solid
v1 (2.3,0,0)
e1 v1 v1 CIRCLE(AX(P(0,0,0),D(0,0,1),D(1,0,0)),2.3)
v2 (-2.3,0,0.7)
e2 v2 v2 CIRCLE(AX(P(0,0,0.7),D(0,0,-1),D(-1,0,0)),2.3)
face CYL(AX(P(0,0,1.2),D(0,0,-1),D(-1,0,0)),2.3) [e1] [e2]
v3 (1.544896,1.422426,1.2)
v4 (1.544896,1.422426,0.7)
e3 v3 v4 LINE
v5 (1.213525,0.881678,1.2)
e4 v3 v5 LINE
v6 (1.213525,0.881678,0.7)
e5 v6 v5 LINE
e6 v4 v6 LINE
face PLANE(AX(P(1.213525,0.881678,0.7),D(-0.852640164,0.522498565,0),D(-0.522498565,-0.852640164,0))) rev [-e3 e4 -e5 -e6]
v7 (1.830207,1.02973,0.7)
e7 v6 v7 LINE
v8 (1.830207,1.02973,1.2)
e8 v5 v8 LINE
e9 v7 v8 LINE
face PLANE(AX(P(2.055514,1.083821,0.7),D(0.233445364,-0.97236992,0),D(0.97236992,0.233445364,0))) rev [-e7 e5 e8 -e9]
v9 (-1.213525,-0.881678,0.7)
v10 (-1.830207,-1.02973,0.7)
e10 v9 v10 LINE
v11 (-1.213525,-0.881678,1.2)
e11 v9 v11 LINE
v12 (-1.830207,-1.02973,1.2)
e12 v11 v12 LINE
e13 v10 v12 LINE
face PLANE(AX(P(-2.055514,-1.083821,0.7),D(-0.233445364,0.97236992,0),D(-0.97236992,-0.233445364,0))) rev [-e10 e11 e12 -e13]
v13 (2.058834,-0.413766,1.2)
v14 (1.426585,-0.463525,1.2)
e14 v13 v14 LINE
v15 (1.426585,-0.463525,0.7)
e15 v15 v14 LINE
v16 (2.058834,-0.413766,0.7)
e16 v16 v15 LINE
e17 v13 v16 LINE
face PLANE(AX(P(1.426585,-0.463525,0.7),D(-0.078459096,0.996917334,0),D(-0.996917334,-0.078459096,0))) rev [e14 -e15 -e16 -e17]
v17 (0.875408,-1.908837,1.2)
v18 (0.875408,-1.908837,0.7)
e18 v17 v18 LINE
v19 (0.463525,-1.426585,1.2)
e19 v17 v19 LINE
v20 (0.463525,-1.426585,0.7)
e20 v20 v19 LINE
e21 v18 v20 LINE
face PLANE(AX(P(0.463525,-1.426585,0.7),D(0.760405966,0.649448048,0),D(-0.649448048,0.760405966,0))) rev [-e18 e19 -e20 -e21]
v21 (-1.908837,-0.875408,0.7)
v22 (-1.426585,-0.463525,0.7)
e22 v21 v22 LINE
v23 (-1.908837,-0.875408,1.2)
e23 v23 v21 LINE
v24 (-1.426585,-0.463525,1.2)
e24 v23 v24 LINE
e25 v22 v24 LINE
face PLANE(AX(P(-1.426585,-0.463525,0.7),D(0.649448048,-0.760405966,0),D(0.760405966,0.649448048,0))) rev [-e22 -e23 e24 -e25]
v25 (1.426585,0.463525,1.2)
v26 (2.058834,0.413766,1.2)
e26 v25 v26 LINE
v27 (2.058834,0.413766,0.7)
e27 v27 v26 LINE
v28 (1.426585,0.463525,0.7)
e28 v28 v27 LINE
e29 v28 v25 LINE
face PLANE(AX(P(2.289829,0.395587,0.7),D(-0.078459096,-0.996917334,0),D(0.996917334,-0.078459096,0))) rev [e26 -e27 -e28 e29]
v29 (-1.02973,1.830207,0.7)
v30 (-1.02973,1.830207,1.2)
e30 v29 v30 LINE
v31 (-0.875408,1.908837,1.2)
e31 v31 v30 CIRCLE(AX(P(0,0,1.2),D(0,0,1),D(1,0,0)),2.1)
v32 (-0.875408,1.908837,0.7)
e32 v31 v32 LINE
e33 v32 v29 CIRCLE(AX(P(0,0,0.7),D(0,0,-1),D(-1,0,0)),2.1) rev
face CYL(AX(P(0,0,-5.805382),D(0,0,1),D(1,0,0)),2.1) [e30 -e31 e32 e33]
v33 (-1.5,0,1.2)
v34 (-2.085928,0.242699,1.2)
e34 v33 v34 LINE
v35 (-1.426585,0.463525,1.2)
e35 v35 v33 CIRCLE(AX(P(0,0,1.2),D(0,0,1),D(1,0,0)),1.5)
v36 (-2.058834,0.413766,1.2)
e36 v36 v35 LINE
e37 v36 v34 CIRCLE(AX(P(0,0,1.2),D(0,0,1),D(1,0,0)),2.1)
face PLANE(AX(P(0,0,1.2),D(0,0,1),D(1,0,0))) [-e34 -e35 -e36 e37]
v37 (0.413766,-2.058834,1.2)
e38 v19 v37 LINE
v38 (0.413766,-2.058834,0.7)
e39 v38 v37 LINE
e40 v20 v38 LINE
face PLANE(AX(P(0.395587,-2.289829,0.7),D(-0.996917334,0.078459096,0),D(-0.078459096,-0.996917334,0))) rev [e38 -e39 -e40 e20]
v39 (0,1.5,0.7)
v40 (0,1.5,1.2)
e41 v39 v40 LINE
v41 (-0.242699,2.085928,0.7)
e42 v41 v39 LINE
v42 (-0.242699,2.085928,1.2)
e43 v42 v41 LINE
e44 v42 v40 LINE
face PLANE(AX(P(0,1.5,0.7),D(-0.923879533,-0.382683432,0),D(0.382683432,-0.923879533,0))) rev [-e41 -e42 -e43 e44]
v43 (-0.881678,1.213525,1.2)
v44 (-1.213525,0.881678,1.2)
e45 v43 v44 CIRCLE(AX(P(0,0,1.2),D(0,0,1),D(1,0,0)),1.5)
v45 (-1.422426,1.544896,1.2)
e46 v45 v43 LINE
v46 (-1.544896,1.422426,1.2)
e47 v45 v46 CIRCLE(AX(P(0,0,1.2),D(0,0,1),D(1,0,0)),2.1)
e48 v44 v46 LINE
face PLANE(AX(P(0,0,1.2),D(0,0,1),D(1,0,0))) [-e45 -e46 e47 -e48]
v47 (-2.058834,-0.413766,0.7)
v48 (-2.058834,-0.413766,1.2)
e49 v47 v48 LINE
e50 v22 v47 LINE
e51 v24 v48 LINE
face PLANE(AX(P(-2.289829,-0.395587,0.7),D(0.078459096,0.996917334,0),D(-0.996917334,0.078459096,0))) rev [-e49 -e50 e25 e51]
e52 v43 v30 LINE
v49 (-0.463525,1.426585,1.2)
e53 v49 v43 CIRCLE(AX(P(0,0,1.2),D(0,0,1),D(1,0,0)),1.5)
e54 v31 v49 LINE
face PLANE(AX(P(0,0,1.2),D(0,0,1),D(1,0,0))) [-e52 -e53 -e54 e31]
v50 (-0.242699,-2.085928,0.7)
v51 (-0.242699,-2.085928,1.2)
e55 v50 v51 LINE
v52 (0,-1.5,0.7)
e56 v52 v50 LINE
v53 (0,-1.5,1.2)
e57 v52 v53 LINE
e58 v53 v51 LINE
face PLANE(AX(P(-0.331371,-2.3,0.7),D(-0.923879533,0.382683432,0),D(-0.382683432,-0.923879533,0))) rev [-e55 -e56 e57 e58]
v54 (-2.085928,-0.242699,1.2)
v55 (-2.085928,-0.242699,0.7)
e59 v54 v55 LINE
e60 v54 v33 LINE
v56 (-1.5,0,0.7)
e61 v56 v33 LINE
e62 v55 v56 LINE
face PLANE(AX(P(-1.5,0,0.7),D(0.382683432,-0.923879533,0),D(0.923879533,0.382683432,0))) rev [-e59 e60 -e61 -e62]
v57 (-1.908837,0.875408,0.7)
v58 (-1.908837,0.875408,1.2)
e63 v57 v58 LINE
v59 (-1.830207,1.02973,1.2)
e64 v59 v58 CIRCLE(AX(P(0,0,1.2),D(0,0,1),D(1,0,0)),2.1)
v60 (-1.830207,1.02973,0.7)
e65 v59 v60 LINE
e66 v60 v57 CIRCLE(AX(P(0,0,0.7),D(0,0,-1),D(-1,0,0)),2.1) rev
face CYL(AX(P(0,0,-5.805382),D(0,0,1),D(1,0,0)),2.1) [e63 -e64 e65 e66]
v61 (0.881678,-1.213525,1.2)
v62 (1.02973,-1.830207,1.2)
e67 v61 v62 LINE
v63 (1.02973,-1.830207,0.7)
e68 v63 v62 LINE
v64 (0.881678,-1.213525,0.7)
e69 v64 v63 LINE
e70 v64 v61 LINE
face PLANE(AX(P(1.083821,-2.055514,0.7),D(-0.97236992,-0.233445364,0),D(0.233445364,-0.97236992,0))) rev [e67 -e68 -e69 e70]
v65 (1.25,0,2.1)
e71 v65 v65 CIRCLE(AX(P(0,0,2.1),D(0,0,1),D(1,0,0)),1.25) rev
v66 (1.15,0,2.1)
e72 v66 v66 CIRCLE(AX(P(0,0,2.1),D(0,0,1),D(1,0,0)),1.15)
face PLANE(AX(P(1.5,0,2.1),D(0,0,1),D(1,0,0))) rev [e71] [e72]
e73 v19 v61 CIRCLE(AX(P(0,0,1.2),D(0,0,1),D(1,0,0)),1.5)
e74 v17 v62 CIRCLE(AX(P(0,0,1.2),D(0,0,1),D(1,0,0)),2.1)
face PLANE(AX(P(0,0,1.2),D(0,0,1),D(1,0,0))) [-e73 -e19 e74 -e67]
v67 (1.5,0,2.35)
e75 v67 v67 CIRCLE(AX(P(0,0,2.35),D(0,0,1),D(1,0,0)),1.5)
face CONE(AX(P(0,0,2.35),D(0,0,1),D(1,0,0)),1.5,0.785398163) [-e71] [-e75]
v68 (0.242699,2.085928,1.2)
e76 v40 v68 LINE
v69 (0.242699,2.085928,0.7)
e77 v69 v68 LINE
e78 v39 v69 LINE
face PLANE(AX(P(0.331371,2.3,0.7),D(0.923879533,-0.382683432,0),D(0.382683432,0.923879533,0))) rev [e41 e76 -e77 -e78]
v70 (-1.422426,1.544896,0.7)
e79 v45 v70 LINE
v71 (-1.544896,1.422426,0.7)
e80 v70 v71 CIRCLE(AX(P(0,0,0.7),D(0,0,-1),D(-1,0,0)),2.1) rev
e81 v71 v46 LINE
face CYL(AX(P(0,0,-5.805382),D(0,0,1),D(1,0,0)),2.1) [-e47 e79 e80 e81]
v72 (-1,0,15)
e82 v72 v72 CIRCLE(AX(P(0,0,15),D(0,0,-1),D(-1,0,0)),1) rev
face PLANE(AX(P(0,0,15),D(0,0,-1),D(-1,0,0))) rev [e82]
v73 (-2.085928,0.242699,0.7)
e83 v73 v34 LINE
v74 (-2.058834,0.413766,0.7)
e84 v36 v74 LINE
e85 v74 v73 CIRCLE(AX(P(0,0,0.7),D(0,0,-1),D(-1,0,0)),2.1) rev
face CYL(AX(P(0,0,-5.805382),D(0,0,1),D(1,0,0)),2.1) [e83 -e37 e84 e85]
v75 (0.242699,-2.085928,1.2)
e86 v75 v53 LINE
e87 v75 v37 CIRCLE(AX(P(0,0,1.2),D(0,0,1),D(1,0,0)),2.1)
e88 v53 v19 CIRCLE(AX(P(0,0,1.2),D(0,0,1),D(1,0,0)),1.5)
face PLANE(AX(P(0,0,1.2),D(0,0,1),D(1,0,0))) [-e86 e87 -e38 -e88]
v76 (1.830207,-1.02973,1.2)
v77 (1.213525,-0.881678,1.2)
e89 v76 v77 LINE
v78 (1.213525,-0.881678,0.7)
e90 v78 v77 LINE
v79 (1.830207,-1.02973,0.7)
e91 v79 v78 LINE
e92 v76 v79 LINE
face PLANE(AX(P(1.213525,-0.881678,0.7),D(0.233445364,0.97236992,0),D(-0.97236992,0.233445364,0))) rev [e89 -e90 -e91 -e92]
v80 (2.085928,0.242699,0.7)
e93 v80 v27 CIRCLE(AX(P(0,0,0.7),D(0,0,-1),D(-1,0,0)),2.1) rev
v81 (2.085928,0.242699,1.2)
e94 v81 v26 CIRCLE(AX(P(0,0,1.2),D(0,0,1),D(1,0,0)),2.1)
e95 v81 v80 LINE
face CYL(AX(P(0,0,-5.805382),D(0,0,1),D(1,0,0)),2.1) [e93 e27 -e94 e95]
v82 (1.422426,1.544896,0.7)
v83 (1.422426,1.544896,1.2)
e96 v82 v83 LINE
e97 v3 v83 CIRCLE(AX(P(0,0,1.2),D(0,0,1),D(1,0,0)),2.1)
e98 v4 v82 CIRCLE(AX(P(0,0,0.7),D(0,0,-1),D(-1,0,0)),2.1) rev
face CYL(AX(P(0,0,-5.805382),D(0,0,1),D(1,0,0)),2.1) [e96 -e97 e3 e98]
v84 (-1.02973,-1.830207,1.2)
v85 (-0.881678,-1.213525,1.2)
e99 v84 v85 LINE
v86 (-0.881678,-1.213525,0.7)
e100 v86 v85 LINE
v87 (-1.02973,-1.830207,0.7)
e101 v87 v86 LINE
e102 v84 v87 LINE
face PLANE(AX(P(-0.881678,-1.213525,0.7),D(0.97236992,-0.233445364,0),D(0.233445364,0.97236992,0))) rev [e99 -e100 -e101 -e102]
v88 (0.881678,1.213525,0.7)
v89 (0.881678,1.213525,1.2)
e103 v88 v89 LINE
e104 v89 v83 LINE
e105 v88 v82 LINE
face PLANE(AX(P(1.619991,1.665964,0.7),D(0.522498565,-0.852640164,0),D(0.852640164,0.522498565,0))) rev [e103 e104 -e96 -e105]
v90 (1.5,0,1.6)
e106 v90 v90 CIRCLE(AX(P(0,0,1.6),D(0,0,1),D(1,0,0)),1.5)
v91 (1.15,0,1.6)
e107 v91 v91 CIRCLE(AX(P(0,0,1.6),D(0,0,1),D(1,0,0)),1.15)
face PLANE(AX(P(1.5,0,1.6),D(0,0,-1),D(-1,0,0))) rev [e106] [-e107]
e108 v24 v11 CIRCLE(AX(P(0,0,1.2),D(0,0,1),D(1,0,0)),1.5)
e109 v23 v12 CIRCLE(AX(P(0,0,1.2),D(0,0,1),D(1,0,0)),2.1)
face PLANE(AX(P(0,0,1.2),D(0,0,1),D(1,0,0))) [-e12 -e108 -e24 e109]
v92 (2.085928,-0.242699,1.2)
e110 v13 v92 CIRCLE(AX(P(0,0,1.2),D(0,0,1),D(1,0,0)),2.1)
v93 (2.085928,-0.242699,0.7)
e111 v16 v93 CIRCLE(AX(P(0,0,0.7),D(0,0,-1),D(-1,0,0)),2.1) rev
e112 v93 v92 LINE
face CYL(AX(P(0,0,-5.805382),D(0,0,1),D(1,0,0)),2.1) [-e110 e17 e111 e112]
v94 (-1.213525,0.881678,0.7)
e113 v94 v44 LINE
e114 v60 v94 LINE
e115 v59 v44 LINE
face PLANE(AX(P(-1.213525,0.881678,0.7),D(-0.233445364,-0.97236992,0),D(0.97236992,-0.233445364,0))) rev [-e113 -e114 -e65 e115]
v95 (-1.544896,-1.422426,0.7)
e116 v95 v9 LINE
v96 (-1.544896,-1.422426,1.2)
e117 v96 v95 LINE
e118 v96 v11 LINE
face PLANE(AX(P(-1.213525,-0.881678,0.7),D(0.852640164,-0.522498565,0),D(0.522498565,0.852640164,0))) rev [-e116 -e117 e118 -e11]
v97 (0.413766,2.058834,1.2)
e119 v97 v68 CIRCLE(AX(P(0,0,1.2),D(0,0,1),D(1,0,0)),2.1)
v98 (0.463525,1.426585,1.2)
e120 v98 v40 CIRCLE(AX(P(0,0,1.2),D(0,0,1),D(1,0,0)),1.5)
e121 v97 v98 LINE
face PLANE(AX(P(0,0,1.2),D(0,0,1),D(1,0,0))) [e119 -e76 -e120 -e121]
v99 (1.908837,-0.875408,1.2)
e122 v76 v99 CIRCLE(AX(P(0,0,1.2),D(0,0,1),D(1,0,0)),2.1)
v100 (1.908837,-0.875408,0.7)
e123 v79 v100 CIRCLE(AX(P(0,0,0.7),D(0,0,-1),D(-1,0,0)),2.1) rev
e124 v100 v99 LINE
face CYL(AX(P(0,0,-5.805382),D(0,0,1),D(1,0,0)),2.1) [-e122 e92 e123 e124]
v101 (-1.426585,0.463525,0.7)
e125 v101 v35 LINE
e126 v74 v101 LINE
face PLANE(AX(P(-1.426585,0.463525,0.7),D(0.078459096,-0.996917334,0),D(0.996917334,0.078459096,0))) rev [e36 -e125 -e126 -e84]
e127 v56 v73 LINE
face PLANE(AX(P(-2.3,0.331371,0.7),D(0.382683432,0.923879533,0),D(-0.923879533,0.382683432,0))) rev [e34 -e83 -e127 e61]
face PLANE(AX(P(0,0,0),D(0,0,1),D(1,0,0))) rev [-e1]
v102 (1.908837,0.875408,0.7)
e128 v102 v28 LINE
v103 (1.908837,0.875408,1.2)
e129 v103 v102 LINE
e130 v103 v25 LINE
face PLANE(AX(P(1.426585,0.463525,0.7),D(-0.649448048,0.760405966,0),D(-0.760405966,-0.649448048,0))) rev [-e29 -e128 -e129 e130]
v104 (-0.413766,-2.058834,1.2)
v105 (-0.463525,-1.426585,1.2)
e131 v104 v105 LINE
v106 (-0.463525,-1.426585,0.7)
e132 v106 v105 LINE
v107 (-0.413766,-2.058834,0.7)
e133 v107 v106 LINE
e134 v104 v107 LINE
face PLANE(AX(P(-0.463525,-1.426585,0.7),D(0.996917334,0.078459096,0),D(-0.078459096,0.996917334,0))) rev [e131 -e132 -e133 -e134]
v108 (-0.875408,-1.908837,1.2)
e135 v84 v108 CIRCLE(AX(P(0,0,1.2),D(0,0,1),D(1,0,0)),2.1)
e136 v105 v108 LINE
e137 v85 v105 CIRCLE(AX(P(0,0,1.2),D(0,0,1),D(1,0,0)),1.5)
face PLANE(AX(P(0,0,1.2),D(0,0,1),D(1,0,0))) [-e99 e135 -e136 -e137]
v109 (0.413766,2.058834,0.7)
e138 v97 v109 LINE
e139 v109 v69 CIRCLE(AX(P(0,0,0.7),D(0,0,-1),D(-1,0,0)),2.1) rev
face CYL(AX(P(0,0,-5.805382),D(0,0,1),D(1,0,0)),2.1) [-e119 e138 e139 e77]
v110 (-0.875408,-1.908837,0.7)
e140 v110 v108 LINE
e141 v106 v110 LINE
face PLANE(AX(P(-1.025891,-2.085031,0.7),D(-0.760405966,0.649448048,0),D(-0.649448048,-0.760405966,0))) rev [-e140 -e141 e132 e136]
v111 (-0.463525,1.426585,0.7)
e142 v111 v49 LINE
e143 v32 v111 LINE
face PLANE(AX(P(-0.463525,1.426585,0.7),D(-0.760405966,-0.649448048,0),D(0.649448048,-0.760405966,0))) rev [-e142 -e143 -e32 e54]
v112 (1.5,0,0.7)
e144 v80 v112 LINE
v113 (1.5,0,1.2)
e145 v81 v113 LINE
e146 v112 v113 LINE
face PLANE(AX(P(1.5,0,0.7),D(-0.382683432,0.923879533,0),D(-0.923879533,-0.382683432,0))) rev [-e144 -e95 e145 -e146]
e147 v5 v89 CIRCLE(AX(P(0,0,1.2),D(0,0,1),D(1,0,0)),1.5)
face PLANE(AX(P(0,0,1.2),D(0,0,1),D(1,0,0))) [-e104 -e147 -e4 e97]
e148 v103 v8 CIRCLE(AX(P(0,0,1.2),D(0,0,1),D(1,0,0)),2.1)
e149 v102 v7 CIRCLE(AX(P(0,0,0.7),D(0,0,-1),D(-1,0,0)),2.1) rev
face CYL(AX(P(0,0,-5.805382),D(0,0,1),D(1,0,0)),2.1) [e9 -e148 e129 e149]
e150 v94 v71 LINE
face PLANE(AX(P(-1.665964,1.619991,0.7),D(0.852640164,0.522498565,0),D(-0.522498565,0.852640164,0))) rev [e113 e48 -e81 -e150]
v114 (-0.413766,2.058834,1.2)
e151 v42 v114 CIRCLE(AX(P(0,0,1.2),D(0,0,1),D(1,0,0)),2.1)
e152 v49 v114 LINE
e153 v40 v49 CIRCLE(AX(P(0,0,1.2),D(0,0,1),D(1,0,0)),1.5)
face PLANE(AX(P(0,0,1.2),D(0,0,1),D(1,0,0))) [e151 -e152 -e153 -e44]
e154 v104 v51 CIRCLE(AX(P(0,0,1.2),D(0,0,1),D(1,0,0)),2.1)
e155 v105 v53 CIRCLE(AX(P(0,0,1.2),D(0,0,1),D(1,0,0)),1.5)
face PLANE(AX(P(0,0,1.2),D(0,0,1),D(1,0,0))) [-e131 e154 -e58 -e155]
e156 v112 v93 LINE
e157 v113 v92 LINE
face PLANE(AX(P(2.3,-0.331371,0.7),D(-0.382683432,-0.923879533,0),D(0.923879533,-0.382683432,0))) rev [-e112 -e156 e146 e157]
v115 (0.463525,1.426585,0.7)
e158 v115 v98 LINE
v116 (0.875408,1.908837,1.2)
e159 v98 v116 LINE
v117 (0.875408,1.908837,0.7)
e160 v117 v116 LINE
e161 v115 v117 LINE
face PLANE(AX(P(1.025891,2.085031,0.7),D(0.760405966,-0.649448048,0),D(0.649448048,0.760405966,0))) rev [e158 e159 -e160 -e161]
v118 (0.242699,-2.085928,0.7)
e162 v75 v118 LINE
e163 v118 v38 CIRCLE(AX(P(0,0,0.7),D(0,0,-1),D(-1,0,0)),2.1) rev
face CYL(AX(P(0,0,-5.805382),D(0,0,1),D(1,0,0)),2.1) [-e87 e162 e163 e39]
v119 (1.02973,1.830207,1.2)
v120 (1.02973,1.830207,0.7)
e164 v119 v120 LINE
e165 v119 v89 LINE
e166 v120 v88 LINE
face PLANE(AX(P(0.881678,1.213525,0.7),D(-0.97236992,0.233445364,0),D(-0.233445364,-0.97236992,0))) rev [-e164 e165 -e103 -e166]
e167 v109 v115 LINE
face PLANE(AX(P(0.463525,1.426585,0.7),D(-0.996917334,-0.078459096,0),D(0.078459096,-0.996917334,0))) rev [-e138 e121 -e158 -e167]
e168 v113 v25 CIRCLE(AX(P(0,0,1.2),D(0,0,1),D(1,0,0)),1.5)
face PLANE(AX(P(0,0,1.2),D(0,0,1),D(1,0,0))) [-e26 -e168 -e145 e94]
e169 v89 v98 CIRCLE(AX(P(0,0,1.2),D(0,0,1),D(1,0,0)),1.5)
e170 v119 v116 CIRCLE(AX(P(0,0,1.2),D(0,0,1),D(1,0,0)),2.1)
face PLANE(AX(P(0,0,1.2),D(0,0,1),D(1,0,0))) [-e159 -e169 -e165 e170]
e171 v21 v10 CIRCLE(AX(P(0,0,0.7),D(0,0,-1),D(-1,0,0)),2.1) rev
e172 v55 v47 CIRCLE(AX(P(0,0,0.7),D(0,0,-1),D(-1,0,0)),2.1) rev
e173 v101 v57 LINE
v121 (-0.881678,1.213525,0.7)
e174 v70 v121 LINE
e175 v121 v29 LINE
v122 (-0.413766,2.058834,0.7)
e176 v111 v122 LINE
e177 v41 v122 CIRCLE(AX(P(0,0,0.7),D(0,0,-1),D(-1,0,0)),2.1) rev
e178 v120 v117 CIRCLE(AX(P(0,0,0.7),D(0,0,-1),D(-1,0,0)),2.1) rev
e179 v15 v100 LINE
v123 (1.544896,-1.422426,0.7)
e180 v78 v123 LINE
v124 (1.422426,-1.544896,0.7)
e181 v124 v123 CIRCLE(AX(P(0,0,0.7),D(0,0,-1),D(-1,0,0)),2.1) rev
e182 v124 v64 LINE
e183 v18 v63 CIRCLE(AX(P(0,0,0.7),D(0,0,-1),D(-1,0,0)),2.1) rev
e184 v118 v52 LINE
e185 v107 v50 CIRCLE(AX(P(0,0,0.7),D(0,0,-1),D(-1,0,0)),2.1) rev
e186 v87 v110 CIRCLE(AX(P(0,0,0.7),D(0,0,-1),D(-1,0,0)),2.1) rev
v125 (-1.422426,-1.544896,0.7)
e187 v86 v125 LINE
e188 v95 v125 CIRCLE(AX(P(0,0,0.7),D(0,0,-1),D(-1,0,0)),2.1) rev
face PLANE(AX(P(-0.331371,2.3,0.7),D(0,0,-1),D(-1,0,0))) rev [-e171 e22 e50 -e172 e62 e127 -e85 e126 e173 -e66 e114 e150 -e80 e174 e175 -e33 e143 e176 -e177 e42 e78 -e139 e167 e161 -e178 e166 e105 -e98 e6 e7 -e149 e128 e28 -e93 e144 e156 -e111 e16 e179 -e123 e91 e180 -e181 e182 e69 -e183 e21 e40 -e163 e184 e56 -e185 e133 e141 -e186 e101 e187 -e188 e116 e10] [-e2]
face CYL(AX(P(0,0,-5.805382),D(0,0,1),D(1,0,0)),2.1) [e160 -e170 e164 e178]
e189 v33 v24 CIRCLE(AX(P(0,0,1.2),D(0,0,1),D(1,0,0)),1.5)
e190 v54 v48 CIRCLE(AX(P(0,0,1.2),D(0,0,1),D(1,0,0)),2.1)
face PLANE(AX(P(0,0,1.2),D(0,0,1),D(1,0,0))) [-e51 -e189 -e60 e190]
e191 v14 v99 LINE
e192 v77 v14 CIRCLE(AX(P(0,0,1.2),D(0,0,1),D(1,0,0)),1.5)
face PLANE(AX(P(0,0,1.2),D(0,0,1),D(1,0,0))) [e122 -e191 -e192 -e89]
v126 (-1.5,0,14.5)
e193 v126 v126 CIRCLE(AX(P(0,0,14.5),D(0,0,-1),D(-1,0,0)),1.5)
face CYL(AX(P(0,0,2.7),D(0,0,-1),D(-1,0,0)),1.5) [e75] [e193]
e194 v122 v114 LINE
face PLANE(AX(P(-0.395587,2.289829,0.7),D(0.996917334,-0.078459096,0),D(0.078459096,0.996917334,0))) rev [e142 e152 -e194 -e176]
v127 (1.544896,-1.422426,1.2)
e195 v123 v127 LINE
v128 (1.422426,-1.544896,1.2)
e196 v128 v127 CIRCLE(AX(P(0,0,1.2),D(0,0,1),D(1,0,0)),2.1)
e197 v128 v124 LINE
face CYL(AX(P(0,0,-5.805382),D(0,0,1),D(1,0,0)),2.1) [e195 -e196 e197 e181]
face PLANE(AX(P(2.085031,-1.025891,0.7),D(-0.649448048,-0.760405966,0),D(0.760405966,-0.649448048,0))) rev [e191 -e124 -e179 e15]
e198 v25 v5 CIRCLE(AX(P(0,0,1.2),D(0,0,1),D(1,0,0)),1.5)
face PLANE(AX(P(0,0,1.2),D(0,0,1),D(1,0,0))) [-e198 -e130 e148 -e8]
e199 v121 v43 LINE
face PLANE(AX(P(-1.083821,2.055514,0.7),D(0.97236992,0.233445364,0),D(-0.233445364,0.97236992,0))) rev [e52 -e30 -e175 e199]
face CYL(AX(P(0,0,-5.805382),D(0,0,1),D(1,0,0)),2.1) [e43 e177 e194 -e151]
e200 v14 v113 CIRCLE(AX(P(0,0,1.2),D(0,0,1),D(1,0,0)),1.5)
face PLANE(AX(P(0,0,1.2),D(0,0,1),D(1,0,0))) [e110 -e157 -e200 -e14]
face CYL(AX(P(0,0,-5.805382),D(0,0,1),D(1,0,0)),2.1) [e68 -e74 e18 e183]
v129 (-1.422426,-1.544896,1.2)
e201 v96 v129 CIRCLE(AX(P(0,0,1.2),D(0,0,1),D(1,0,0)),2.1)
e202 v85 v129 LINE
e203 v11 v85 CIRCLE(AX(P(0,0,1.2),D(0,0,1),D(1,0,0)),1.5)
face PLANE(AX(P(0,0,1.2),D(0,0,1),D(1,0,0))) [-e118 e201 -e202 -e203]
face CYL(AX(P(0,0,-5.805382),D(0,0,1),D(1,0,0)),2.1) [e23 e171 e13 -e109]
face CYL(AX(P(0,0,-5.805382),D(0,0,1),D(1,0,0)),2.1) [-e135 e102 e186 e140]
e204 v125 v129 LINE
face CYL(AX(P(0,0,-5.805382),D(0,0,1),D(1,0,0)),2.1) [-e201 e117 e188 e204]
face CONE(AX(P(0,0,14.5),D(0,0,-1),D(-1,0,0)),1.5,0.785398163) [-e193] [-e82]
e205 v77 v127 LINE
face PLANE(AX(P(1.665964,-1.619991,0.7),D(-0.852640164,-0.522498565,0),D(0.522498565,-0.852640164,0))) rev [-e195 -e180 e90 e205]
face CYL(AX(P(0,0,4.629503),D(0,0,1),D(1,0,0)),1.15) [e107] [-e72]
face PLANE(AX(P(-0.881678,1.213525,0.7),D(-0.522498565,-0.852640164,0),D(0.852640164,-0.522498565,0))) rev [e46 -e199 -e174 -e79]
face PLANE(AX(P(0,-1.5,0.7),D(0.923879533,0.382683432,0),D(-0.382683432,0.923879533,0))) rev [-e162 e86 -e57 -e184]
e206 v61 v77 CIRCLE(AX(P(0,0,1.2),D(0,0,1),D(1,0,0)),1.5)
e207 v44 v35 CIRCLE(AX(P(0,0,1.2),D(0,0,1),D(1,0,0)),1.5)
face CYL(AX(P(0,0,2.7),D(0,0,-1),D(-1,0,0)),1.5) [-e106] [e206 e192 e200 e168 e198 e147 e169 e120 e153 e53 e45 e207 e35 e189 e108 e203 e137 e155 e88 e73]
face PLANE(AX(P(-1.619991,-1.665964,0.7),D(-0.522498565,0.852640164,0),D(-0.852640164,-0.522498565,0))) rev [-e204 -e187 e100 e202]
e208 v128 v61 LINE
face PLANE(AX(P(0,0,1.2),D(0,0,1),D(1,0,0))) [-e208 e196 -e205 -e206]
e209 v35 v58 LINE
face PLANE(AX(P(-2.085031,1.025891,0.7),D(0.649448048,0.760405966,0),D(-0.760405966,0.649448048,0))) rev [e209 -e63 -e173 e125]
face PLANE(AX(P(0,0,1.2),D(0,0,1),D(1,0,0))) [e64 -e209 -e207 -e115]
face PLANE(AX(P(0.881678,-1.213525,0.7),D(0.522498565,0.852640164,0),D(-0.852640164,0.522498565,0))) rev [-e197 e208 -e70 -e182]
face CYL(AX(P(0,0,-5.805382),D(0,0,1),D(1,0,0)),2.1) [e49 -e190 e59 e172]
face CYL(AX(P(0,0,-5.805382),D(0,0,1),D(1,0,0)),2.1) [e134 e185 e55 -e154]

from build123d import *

# Parameters (mm, degrees)
SKETCH_1_R               = 2.3
EXTRUDE_1_DEPTH          = 1.2
SKETCH_2_R               = 1.4999999999999996
EXTRUDE_2_DEPTH          = 1.5
CUT_EXTRUDE_1_DEPTH      = 0.5
PATTERN_CIRCULAR_1_COUNT = 20
SKETCH_4_W               = 0.3500000000000001
SKETCH_4_H               = 0.49999999999999956
SKETCH_6_W               = 12.300000000000002
SKETCH_6_H               = 1.5
CHAMFER_2_SIZE           = 0.5
CUT_EXTRUDE_START        = -0.5
SKETCH_7_R               = 2.3
SKETCH_7_R_2             = 2.1
CUT_EXTRUDE_2_DEPTH      = 0.5


with BuildPart() as part:
    # Эскиз1 → Вытянуть1 (new body)
    with BuildSketch(Plane.XY):
        Circle(SKETCH_1_R)
    extrude(amount=EXTRUDE_1_DEPTH)

    # Эскиз2 → Вытянуть2 (add)
    with BuildSketch(Plane.XY.offset(1.2)):
        Circle(SKETCH_2_R)
    extrude(amount=EXTRUDE_2_DEPTH)

    # Эскиз3 → Вырез-Вытянуть1 (cut)
    with BuildSketch(Plane.XY.offset(1.2)):
        Polygon((-0.33137084989847343, 2.3), (0.33137084989847343, 2.3), (0, 1.4999999999999996), align=None)
    cut_extrude_1 = extrude(amount=-CUT_EXTRUDE_1_DEPTH, mode=Mode.SUBTRACT)

    # Круговой массив1: Вырез-Вытянуть1 ×20 about axis
    pattern_circular_1_axis = Axis((0, -4e-17, 0), (0, 0, 1))
    for i in range(1, PATTERN_CIRCULAR_1_COUNT):
        add(cut_extrude_1.rotate(pattern_circular_1_axis, i * 360 / PATTERN_CIRCULAR_1_COUNT), mode=Mode.SUBTRACT)

    # Эскиз4 → Вырез-Повернуть1 (revolve, cut)
    with BuildSketch(Plane(origin=(0, 0, 0), x_dir=(1, 0, 0), z_dir=(0, 1, 0))):
        with Locations((1.325, -1.8500000000000003)):
            Rectangle(SKETCH_4_W, SKETCH_4_H)
    revolve(axis=Axis((0, 0, 10.642619982654564), (0, 0, -1)), mode=Mode.SUBTRACT)

    # Эскиз6 → Повернуть1 (revolve)
    with BuildSketch(Plane(origin=(0, 0, 0), x_dir=(0, 0, -1), z_dir=(1, 0, 0)), mode=Mode.PRIVATE) as revolve_1_sk:
        with Locations((-8.850000000000001, -0.75)):
            Rectangle(SKETCH_6_W, SKETCH_6_H)
    revolve(revolve_1_sk.sketch.rotate(Axis((0, 0, 2.6999999999999997), (0, 0, 1)), 278.047567557), axis=Axis((0, 0, 2.6999999999999997), (0, 0, 1)))

    # Фаска2
    # the kernel refuses this chamfer: 0.5 mm, written as the material it takes off along each edge
    with BuildSketch(Plane(origin=(0, 0, 15.000000000000002), x_dir=(-0.9901521845161062, -0.1399951838385265, 0), z_dir=(-0.1399951838385265, 0.9901521845161062, 0))) as chamfer_2_piece_1:
        Polygon((1.4999999999999996, -CHAMFER_2_SIZE), (1.5000000000000004 - CHAMFER_2_SIZE, -1.78e-15), (1.5000000000000004, 0), align=None)
    revolve(axis=Axis((0, 0, 15.000000000000002), (0, 0, 1)), mode=Mode.SUBTRACT)

    # Эскиз7 → Вырез-Вытянуть2 (cut)
    with BuildSketch(Plane.XY.offset(1.2).offset(CUT_EXTRUDE_START)):
        with Locations(Location((0, 0, 0), (0, 0, 180))):
            Circle(SKETCH_7_R)
        Circle(SKETCH_7_R_2, mode=Mode.SUBTRACT)
    extrude(amount=CUT_EXTRUDE_2_DEPTH, mode=Mode.SUBTRACT)

    # Фаска3
    # the kernel refuses this chamfer: 0.25 mm, written as the material it takes off along each edge
    with BuildSketch(Plane(origin=(0, 0, 2.0999999999999996), x_dir=(1, 0, 0), z_dir=(0, 1, 0))) as chamfer_3_piece_1:
        with BuildLine():
            Line((1.2429289321881345, 0.00707106781186528), (1.507071067811865, -0.2570710678118653))
            Line((1.507071067811865, -0.2570710678118653), (1.512071067811865, -0.2570710678118653))
            ThreePointArc((1.512071067811865, -0.2570710678118653), (1.5049999999999994, -0.12853553390593264), (1.505, 0))
            Line((1.505, 0), (1.5, 0.00499999999999989))
            ThreePointArc((1.5, 0.00499999999999989), (1.3714644660940674, 0.00499999999999989), (1.2429289321881345, 0.01207106781186518))
            Line((1.2429289321881345, 0.01207106781186518), (1.2429289321881345, 0.00707106781186528))
        make_face()
    revolve(axis=Axis((0, 0, 2.0999999999999996), (0, 0, -1)), mode=Mode.SUBTRACT)


solid = part.part
